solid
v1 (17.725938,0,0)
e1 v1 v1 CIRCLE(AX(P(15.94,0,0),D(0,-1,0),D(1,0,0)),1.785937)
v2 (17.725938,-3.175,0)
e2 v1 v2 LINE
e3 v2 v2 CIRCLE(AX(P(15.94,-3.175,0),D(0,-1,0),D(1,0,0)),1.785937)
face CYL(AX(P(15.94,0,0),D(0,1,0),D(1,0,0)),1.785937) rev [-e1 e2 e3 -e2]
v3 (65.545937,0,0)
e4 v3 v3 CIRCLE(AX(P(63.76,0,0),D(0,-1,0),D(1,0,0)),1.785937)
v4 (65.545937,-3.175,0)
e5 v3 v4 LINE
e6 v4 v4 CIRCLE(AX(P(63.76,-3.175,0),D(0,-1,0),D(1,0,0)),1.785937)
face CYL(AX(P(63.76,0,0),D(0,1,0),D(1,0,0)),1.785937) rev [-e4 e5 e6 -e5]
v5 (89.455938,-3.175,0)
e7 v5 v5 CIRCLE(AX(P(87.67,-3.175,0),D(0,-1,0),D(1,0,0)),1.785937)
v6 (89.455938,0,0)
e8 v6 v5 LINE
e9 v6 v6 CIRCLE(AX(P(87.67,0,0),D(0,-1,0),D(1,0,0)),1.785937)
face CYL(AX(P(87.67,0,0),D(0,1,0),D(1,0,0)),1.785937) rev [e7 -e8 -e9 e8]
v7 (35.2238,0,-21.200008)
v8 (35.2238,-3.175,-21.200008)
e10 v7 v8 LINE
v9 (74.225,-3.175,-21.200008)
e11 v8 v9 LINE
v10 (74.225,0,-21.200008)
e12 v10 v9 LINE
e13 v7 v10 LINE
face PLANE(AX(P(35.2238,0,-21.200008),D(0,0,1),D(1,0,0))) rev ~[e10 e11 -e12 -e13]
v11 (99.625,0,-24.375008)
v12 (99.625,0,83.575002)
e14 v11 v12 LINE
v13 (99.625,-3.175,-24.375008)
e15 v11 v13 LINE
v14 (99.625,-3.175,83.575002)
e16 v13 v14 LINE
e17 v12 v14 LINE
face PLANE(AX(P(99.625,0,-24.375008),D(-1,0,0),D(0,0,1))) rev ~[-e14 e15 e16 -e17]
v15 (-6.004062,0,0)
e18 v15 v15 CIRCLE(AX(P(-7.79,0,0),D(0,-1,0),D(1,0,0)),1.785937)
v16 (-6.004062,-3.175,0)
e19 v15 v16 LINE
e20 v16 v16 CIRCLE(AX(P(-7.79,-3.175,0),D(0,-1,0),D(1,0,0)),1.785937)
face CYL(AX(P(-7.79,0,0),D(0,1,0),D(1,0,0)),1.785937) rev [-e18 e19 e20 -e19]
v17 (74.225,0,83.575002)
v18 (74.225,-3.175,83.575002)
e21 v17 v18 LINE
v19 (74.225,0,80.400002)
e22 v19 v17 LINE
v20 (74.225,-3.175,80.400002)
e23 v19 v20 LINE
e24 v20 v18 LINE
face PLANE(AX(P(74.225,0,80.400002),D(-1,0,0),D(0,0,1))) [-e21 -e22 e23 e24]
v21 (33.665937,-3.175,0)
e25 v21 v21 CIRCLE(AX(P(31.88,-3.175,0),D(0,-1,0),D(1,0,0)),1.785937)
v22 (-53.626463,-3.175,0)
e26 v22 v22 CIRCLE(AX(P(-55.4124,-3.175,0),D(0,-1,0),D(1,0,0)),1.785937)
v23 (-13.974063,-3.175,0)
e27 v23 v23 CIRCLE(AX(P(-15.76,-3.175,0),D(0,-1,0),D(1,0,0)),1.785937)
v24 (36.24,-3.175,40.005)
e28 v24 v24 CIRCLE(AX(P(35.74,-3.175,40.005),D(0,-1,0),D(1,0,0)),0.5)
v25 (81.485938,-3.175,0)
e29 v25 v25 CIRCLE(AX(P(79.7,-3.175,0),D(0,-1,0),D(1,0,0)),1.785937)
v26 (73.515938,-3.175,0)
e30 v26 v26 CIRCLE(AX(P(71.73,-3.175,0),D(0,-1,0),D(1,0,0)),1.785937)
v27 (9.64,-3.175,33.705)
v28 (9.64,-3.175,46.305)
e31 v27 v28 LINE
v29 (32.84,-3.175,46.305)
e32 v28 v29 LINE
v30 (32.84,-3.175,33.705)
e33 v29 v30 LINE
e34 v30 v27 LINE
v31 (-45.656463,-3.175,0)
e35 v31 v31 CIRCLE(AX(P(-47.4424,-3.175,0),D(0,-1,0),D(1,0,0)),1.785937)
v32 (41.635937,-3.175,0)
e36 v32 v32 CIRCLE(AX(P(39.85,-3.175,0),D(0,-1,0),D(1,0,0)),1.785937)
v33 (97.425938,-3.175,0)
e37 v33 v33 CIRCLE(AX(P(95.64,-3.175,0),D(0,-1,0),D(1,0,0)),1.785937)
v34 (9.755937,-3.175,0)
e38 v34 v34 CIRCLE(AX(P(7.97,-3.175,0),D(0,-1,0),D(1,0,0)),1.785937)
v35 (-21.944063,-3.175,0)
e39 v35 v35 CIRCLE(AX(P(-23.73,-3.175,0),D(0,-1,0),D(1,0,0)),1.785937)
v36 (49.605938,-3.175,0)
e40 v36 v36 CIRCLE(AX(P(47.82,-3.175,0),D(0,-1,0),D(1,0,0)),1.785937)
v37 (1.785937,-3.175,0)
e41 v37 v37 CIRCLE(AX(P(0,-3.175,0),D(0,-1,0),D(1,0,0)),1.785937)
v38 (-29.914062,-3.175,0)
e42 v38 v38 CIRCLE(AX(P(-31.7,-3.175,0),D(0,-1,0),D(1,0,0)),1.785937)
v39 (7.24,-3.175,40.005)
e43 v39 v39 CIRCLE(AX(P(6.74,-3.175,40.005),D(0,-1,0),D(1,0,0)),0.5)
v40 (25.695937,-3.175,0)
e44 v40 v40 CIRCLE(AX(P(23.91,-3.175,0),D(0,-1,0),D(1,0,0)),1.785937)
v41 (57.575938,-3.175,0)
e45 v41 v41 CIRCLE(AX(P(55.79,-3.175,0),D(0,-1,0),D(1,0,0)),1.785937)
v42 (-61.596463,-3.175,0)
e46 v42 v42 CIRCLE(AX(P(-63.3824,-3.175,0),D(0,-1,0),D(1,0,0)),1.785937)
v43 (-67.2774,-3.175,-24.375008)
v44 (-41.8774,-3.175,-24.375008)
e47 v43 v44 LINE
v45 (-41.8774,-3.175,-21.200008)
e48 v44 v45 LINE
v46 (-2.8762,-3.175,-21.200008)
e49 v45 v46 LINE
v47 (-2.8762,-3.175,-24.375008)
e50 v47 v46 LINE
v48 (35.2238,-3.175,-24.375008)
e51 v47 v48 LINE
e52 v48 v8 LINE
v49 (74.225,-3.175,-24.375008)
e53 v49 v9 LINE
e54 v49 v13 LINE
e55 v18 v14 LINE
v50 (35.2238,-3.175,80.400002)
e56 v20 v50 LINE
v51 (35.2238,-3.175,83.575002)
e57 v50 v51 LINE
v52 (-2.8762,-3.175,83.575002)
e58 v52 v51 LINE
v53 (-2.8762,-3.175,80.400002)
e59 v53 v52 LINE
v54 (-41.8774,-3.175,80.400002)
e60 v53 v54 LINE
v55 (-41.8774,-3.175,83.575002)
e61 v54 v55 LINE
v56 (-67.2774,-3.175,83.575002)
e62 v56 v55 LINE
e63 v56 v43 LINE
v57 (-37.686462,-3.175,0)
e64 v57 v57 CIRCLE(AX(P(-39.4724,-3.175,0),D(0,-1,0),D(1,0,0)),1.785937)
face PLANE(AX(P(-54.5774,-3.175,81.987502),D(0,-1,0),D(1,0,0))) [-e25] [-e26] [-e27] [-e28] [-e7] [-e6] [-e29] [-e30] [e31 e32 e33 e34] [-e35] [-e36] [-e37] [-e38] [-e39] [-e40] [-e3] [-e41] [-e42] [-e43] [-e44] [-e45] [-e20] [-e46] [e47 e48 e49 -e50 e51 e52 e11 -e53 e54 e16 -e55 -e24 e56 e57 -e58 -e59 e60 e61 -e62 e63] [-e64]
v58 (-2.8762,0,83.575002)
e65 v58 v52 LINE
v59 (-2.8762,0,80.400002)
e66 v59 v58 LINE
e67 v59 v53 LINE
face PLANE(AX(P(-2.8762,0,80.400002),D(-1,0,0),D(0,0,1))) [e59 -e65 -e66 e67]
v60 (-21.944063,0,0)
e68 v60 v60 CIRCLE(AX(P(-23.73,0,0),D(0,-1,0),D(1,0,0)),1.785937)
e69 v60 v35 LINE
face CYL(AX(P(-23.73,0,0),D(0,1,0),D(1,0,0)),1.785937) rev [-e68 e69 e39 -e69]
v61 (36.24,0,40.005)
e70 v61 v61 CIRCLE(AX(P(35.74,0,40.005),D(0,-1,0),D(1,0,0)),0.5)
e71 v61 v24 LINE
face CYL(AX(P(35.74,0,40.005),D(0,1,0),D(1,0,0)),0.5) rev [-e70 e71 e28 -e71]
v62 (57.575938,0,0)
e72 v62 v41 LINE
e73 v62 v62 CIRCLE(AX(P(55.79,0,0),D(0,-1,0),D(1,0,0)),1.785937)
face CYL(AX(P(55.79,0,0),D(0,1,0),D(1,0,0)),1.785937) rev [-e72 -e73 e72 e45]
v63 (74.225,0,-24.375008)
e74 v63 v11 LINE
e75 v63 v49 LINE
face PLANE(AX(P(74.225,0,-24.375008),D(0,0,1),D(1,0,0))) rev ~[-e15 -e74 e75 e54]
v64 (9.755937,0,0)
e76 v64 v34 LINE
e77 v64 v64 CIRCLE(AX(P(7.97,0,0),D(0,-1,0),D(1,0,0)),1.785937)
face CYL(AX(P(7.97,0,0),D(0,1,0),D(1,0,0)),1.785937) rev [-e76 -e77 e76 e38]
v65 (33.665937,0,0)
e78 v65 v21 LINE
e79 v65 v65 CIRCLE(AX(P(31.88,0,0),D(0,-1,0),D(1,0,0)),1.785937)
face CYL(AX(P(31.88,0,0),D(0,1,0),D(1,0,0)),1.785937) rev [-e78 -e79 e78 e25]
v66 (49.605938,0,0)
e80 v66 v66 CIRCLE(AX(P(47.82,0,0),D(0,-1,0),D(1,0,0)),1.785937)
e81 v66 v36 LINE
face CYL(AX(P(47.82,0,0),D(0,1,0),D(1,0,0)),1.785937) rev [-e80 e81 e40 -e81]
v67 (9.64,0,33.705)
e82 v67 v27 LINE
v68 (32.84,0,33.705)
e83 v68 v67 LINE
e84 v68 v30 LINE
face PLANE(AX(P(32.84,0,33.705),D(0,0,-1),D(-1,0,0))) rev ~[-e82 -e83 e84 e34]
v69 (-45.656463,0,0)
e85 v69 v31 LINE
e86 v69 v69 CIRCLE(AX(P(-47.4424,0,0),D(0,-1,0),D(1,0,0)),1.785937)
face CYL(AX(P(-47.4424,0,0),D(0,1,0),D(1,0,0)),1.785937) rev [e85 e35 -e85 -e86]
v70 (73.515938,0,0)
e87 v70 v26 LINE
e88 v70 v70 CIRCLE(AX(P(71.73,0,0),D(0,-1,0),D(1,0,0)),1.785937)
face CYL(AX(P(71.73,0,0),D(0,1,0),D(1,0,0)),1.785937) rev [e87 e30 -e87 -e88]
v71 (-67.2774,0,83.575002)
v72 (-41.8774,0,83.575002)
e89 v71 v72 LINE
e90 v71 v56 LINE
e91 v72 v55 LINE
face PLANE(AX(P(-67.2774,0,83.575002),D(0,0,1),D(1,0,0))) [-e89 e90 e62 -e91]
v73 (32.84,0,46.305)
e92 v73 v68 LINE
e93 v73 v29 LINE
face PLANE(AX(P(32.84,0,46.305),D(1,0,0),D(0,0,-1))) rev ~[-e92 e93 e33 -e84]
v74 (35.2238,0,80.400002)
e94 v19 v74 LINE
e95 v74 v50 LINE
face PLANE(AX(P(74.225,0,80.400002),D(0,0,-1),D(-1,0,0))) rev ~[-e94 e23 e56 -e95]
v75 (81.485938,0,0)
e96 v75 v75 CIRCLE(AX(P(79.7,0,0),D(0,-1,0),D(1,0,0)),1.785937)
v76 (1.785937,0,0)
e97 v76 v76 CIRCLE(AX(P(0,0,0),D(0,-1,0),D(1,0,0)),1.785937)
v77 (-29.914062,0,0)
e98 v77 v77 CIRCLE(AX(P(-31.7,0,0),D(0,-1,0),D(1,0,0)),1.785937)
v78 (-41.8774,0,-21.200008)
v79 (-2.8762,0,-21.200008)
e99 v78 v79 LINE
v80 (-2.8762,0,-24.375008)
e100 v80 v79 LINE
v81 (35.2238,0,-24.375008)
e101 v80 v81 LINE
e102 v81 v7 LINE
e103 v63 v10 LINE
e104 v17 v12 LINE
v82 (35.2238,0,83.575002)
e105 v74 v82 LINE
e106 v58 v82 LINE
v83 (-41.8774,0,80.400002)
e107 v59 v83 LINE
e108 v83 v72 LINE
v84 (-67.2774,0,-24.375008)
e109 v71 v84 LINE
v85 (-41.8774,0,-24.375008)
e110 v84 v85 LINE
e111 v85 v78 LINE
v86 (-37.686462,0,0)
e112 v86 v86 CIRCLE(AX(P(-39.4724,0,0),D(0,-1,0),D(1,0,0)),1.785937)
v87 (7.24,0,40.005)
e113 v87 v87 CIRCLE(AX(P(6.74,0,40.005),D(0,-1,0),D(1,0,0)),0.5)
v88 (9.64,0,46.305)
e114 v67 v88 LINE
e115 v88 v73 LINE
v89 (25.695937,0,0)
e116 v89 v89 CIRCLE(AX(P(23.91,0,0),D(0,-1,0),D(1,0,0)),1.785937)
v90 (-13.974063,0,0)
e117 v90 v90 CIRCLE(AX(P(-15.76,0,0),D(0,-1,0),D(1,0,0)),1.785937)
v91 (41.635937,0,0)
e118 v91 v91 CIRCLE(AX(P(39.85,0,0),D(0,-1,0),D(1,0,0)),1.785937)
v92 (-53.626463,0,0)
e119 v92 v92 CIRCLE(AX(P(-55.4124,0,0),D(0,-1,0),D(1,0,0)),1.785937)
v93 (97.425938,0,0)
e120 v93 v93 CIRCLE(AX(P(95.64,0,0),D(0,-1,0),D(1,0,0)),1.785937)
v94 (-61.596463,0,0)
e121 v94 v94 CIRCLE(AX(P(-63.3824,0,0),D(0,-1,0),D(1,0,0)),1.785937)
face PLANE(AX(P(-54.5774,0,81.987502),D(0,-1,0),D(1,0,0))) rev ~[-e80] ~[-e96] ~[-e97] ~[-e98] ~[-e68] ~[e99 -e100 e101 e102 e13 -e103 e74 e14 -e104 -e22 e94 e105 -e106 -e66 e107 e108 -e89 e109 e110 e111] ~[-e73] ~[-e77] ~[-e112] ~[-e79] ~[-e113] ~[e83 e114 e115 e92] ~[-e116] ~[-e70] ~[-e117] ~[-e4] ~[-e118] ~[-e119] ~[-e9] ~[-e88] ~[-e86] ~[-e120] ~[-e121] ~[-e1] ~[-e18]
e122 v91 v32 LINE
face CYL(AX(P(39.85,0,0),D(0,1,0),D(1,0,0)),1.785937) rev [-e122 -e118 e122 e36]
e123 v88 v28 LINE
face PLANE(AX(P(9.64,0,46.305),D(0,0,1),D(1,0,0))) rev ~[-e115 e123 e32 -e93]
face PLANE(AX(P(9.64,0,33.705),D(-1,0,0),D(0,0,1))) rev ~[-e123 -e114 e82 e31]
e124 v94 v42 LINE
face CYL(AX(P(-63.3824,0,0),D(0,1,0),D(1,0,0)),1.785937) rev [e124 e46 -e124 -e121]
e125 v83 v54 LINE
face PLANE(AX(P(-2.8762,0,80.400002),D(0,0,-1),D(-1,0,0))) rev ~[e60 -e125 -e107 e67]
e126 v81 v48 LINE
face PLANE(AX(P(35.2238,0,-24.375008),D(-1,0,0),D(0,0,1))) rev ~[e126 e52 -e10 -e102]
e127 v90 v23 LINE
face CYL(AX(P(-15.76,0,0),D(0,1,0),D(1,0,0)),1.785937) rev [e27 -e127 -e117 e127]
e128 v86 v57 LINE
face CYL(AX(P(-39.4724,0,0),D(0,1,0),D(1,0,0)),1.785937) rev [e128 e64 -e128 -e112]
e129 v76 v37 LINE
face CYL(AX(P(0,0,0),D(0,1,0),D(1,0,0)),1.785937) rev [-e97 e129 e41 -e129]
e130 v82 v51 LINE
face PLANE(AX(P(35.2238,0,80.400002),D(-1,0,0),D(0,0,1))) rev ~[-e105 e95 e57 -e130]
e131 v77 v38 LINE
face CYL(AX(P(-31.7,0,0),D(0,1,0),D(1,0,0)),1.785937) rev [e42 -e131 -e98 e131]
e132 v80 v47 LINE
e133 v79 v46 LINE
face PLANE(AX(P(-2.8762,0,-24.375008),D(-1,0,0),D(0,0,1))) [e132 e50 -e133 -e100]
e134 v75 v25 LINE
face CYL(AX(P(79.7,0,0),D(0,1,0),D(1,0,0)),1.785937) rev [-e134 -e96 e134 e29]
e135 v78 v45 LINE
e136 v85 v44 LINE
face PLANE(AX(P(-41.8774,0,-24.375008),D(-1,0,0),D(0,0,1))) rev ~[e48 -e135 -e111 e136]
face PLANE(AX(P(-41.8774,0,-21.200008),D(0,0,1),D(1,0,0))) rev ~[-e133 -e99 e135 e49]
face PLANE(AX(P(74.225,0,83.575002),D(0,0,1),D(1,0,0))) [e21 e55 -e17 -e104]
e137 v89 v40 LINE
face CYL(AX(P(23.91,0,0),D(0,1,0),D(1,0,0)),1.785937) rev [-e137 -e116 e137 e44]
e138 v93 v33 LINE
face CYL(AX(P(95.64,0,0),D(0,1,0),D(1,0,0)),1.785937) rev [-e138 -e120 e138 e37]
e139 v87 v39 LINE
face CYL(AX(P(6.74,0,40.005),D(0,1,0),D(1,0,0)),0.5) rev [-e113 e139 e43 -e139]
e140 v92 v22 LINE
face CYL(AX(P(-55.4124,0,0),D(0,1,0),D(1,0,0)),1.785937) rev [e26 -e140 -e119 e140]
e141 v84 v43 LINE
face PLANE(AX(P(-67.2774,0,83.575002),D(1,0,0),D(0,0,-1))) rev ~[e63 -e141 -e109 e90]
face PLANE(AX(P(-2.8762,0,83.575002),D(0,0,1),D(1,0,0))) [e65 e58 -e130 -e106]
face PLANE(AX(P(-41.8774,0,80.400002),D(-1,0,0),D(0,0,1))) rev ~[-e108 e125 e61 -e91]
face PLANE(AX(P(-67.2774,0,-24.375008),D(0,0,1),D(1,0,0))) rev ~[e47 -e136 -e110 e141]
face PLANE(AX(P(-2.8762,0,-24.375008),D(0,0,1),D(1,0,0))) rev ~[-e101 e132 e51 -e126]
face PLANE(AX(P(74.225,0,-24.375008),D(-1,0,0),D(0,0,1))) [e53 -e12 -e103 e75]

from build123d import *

# Parameters (mm, degrees)
F0_W     = 25.4
F0_H     = 3.175
F0_W_2   = 38.1
F0_R     = 1.7859375
F0_R_2   = 0.5
F1_DEPTH = 3.175


# Not quite as in the source:
# - a length typed as a fraction of an inch, garbled in the dataset ("3 / 203.2 mm" for 3/8 in), is restored


with BuildPart() as f1:
    # F0 (on Front) → F1 (new body)
    with BuildSketch(Plane.XZ):
        with Locations((-54.5774, 81.9875024)):
            Rectangle(F0_W, F0_H)
        with Locations((16.1738, 81.9875024)):
            Rectangle(F0_W_2, F0_H)
        with Locations((86.925, 81.9875024)):
            Rectangle(F0_W, F0_H)
        with Locations((86.925, -22.7875084)):
            Rectangle(F0_W, F0_H)
        with Locations((16.1738, -22.7875084)):
            Rectangle(F0_W_2, F0_H)
        with Locations((-54.5774, -22.7875084)):
            Rectangle(F0_W, F0_H)
        Polygon((-67.2774, 57.3229712169), (-67.2774, -21.2000084), (-41.8774, -21.2000084), (-2.8762, -21.2000084), (35.2238, -21.2000084), (74.225, -21.2000084), (99.625, -21.2000084), (99.625, 80.4000024), (74.225, 80.4000024), (35.2238, 80.4000024), (-2.8762, 80.4000024), (-41.8774, 80.4000024), (-67.2774, 80.4000024), align=None)
        with Locations((-63.3824, 0)):
            Circle(F0_R, mode=Mode.SUBTRACT)
        with Locations((-55.4124, 0)):
            Circle(F0_R, mode=Mode.SUBTRACT)
        with Locations((-47.4424, 0)):
            Circle(F0_R, mode=Mode.SUBTRACT)
        with Locations((-39.4724, 0)):
            Circle(F0_R, mode=Mode.SUBTRACT)
        with Locations((-31.7, 0)):
            Circle(F0_R, mode=Mode.SUBTRACT)
        with Locations((-23.73, 0)):
            Circle(F0_R, mode=Mode.SUBTRACT)
        with Locations((-15.76, 0)):
            Circle(F0_R, mode=Mode.SUBTRACT)
        with Locations((-7.79, 0)):
            Circle(F0_R, mode=Mode.SUBTRACT)
        Circle(F0_R, mode=Mode.SUBTRACT)
        with Locations((7.97, 0)):
            Circle(F0_R, mode=Mode.SUBTRACT)
        with Locations((15.94, 0)):
            Circle(F0_R, mode=Mode.SUBTRACT)
        with Locations((23.91, 0)):
            Circle(F0_R, mode=Mode.SUBTRACT)
        with Locations((31.88, 0)):
            Circle(F0_R, mode=Mode.SUBTRACT)
        with Locations((39.85, 0)):
            Circle(F0_R, mode=Mode.SUBTRACT)
        with Locations((47.82, 0)):
            Circle(F0_R, mode=Mode.SUBTRACT)
        with Locations((55.79, 0)):
            Circle(F0_R, mode=Mode.SUBTRACT)
        with Locations((63.76, 0)):
            Circle(F0_R, mode=Mode.SUBTRACT)
        with Locations((71.73, 0)):
            Circle(F0_R, mode=Mode.SUBTRACT)
        with Locations((79.7, 0)):
            Circle(F0_R, mode=Mode.SUBTRACT)
        with Locations((87.67, 0)):
            Circle(F0_R, mode=Mode.SUBTRACT)
        with Locations((95.64, 0)):
            Circle(F0_R, mode=Mode.SUBTRACT)
        with Locations((6.74, 40.005)):
            Circle(F0_R_2, mode=Mode.SUBTRACT)
        Polygon((9.64, 40.005), (9.64, 46.305), (15.94, 46.305), (32.84, 46.305), (32.84, 33.705), (15.94, 33.705), (9.64, 33.705), align=None, mode=Mode.SUBTRACT)
        with Locations((35.74, 40.005)):
            Circle(F0_R_2, mode=Mode.SUBTRACT)
    extrude(amount=F1_DEPTH)


solid = f1.part
